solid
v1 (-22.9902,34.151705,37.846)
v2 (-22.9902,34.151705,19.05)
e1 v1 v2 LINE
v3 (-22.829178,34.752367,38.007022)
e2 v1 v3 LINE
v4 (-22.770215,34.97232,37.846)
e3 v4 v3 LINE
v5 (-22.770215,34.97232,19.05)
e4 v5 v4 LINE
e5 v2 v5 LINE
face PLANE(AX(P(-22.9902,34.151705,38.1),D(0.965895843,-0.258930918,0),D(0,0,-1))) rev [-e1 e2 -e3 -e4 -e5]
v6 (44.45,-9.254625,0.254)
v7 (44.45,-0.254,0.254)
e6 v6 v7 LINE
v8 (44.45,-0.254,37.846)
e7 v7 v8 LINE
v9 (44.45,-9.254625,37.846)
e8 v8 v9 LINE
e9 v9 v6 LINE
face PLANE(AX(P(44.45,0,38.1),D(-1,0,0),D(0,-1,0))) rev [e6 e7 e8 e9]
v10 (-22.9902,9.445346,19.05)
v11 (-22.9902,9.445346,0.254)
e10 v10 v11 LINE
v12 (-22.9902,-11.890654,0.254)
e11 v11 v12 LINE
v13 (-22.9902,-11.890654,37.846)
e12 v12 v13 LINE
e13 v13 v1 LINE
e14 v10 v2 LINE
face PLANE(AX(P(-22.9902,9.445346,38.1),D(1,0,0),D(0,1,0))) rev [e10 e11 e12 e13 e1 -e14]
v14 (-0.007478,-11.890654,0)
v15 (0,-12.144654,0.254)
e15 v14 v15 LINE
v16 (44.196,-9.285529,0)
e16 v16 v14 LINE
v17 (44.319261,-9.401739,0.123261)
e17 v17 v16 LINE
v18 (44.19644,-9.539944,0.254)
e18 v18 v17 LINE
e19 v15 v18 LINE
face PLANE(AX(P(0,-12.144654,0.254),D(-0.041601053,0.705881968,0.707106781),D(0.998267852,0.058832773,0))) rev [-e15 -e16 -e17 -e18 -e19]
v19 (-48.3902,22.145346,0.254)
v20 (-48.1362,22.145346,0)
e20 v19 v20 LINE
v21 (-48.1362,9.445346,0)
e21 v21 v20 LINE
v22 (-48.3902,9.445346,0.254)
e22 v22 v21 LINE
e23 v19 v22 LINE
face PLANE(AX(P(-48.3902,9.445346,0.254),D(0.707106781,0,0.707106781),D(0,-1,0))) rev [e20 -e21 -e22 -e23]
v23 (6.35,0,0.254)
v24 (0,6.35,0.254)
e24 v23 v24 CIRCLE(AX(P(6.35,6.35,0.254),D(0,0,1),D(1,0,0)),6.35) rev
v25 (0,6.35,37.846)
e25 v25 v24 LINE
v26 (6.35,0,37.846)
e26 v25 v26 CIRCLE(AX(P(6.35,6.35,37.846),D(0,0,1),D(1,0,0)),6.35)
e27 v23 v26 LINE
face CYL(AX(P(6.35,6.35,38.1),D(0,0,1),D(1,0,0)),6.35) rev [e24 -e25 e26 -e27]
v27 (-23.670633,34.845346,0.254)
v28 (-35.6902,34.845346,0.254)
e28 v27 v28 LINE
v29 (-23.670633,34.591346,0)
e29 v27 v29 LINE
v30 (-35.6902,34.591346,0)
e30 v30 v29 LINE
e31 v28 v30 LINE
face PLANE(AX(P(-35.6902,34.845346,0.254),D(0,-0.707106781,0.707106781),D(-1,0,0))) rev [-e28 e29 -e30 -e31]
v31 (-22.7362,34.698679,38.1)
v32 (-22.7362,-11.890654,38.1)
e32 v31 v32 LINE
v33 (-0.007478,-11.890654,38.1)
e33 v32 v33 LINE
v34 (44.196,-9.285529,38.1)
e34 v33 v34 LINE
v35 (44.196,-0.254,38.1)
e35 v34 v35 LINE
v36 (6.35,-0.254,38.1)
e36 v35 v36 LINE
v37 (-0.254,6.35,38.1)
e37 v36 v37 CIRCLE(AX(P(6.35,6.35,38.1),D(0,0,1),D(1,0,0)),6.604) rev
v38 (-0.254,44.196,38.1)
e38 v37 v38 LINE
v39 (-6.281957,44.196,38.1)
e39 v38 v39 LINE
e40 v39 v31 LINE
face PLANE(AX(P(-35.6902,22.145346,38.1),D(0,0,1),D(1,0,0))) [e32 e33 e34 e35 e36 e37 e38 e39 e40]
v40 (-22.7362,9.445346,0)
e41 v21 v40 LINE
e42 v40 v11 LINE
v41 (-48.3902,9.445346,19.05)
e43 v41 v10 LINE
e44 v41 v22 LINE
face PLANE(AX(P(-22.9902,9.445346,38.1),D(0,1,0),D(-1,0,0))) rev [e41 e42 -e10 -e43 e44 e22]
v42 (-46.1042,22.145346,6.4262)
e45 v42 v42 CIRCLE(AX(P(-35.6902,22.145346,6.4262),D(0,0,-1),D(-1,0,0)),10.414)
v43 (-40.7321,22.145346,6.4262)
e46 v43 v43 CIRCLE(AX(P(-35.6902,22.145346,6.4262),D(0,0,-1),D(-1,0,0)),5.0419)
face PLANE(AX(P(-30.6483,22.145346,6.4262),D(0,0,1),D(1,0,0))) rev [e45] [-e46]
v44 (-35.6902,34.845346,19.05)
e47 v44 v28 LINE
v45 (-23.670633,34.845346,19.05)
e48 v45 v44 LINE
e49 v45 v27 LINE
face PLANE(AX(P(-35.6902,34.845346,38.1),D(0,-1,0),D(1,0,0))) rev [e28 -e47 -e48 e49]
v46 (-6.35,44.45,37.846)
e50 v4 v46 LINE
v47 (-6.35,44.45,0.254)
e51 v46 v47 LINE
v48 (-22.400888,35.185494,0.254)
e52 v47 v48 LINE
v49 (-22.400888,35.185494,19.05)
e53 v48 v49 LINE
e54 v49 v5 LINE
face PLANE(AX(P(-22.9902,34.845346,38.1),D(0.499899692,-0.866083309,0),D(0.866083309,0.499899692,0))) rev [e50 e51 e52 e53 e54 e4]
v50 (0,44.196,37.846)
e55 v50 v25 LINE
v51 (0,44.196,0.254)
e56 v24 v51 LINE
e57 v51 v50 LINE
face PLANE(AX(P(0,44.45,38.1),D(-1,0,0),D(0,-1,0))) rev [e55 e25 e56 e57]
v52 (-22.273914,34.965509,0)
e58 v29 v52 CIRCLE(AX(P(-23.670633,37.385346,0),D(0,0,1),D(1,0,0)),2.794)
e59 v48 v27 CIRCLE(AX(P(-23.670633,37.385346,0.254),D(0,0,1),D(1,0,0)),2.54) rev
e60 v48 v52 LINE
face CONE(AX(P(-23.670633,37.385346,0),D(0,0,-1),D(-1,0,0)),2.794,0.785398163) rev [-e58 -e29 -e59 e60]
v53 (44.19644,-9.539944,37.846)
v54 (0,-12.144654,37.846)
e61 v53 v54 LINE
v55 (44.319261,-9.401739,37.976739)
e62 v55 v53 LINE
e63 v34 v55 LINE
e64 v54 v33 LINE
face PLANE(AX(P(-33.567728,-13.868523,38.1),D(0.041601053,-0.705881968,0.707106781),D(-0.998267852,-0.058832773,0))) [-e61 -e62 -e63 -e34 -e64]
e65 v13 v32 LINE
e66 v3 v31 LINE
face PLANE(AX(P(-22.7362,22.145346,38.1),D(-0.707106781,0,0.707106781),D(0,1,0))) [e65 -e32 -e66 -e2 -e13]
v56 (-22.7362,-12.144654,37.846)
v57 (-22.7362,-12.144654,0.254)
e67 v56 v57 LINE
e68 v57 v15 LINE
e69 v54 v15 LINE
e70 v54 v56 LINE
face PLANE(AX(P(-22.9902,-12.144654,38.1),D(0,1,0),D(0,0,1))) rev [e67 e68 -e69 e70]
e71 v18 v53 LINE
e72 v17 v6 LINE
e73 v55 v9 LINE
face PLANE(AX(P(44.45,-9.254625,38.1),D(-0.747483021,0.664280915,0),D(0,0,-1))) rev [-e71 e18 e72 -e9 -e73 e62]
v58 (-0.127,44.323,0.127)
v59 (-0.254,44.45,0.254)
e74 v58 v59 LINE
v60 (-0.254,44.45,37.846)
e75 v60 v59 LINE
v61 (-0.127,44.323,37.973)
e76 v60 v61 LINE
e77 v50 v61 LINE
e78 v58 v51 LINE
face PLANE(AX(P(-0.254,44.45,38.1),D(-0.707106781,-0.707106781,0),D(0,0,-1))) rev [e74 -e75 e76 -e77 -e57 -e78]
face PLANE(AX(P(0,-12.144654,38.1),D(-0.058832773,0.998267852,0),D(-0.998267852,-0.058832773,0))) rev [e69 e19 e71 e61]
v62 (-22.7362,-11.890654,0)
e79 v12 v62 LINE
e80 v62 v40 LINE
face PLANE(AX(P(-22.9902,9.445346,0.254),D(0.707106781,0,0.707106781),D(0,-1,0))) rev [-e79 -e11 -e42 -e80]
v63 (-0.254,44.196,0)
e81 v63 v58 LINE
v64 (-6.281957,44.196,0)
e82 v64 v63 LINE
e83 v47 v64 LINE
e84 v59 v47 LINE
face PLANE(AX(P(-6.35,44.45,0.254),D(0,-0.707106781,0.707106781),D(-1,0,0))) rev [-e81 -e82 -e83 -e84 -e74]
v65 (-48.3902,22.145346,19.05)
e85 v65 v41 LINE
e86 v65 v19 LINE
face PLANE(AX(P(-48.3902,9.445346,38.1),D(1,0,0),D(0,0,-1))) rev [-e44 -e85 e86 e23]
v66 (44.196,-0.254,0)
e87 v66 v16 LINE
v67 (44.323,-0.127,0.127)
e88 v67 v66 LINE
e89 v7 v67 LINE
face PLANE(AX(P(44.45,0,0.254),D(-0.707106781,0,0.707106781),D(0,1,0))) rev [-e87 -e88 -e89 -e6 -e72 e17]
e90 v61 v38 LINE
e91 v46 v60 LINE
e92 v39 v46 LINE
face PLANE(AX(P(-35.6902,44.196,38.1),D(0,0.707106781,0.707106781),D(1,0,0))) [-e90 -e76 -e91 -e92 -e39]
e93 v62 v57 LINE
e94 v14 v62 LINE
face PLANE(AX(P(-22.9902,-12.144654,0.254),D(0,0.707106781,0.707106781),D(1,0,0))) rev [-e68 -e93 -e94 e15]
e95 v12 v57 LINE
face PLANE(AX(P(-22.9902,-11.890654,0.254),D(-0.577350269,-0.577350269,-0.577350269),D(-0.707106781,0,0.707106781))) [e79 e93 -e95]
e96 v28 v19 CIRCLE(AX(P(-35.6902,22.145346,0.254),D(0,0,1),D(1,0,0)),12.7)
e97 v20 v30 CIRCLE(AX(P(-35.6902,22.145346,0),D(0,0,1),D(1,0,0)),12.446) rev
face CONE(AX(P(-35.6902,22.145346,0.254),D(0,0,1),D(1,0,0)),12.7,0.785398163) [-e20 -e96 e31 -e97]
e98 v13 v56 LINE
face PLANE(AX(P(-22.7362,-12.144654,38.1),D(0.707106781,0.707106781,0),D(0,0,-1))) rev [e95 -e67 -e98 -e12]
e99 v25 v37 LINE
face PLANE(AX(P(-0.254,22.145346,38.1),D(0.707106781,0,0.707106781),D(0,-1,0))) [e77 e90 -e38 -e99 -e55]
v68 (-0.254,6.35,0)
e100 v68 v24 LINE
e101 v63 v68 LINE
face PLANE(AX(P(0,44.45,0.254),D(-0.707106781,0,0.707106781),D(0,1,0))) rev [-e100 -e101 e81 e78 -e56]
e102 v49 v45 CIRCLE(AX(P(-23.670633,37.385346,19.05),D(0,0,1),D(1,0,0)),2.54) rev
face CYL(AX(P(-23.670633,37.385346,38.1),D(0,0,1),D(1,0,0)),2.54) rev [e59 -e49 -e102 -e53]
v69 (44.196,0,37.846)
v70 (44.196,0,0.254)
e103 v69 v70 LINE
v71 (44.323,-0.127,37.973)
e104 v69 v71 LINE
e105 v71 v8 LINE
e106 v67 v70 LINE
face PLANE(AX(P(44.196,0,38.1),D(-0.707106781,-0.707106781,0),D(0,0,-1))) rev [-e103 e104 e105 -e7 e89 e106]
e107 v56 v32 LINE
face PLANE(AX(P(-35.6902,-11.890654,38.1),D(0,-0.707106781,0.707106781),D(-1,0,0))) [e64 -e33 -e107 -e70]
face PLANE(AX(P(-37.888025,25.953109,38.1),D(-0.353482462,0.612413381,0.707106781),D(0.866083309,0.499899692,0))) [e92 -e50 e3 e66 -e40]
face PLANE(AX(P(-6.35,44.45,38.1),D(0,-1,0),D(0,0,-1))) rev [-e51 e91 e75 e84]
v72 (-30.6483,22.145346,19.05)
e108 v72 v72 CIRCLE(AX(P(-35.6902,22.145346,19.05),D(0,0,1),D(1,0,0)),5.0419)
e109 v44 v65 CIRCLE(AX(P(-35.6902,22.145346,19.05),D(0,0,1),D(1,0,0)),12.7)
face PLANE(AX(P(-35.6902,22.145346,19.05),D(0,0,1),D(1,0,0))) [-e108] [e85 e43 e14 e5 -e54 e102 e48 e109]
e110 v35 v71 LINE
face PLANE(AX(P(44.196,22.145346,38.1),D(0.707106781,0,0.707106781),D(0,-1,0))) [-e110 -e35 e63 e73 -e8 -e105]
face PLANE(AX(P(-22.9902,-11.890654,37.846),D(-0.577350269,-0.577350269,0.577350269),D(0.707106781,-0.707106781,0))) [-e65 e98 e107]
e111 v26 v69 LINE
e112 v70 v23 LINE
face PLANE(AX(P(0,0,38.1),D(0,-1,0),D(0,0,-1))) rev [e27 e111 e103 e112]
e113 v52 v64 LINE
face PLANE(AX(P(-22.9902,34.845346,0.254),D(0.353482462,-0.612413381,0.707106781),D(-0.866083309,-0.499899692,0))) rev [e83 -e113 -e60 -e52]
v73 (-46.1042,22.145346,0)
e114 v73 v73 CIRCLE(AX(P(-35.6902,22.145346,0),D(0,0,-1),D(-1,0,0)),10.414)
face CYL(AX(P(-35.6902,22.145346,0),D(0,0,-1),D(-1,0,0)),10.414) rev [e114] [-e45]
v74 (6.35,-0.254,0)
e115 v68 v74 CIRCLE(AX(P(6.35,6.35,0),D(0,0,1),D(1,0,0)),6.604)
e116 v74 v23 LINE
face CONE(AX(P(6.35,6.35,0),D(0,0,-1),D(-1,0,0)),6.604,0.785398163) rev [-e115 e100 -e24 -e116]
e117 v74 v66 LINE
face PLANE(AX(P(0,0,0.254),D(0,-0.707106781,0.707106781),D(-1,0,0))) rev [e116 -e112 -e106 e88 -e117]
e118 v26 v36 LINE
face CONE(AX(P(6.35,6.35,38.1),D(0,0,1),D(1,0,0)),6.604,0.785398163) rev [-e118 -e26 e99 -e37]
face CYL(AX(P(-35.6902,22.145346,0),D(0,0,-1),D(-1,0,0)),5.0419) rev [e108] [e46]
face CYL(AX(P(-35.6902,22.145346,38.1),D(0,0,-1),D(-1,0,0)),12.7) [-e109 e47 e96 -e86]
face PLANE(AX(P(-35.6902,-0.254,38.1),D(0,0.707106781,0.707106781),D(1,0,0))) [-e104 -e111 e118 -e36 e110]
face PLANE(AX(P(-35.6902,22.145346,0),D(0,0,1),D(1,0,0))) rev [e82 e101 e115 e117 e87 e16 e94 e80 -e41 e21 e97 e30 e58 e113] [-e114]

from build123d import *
from OCP.BRepFilletAPI import BRepFilletAPI_MakeChamfer

# Parameters (mm, degrees)
BOSS_EXTRUDE1_DEPTH                                  = 38.1
FILLET2_R                                            = 6.35
CUT_EXTRUDE1_START                                   = -19.05
CUT_EXTRUDE1_DEPTH                                   = 19.05
FILLET3_R                                            = 2.54
CBORE_FOR_3_8_BINDING_HEAD_MACHINE_SCREW_D           = 10.0838
CBORE_FOR_3_8_BINDING_HEAD_MACHINE_SCREW_CBORE_D     = 20.828
CBORE_FOR_3_8_BINDING_HEAD_MACHINE_SCREW_CBORE_DEPTH = 6.4262
CHAMFER3_SIZE                                        = 0.254
CHAMFER5_SIZE                                        = 0.254
CHAMFER5_SIZE2                                       = 0.270375256


with BuildPart() as part:
    # Sketch1 → Boss-Extrude1 (new body)
    with BuildSketch(Plane.XY):
        with BuildLine():
            Line((0, 0), (44.45, 0))
            Line((44.45, 0), (44.45, -9.525))
            Line((44.45, -9.525), (0, -12.1446544))
            Line((0, -12.1446544), (-22.9902, -12.1446544))
            Line((-22.9902, -12.1446544), (-22.9902, 9.4453456))
            Line((-22.9902, 9.4453456), (-48.3902, 9.4453456))
            Line((-48.3902, 9.4453456), (-48.3902, 22.1453456))
            ThreePointArc((-48.3902, 22.1453456), (-44.670456121, 31.125601721), (-35.6902, 34.8453456))
            Line((-35.6902, 34.8453456), (-22.9902, 34.8453456))
            Line((-22.9902, 34.8453456), (-6.35, 44.45))
            Line((-6.35, 44.45), (0, 44.45))
            Line((0, 44.45), (0, 0))
        make_face()
    extrude(amount=BOSS_EXTRUDE1_DEPTH)

    # Fillet2
    fillet2_edges = [part.edges().sort_by_distance(p)[0] for p in [
        (0, 0, 19.05),
    ]]
    fillet(fillet2_edges, radius=FILLET2_R)

    # Sketch3 → Cut-Extrude1 (cut)
    with BuildSketch(Plane.XY.offset(38.1).offset(CUT_EXTRUDE1_START)):
        with BuildLine():
            Line((-48.3902, 9.4453456), (-22.9902, 9.4453456))
            Line((-22.9902, 9.4453456), (-22.9902, 34.8453456))
            Line((-22.9902, 34.8453456), (-35.6902, 34.8453456))
            ThreePointArc((-35.6902, 34.8453456), (-44.670456121, 31.125601721), (-48.3902, 22.1453456))
            Line((-48.3902, 22.1453456), (-48.3902, 9.4453456))
        make_face()
    extrude(amount=CUT_EXTRUDE1_DEPTH, mode=Mode.SUBTRACT)

    # Fillet3
    fillet3_edges = [part.edges().sort_by_distance(p)[0] for p in [
        (-22.9902, 34.8453456, 9.525),
    ]]
    fillet(fillet3_edges, radius=FILLET3_R)

    # CBORE for 3/8 Binding Head Machine Screw1 (through all)
    with Locations(Plane(origin=(0, 0, 0), x_dir=(-1, 0, 0), z_dir=(0, 0, -1))):
        with Locations((35.6902, 22.1453456)):
            CounterBoreHole(CBORE_FOR_3_8_BINDING_HEAD_MACHINE_SCREW_D / 2, CBORE_FOR_3_8_BINDING_HEAD_MACHINE_SCREW_CBORE_D / 2, CBORE_FOR_3_8_BINDING_HEAD_MACHINE_SCREW_CBORE_DEPTH)

    # Chamfer3
    chamfer3_edges = [part.edges().sort_by_distance(p)[0] for p in [
        (25.4, 0, 0),
        (44.45, 0, 19.05),
        (0, 44.45, 19.05),
        (0, 25.4, 0),
        (0, 25.4, 38.1),
        (1.859871939, 1.859871939, 0),
        (1.859871939, 1.859871939, 38.1),
        (25.4, 0, 38.1),
    ]]
    chamfer(chamfer3_edges, length=CHAMFER3_SIZE)

    # Chamfer5: one chamfer whose edges measure the first distance from different faces: ONE call of the kernel's chamfer builder (chamfer() names one face for all edges)
    chamfer5_edges_1 = [part.edges().sort_by_distance(p)[0] for p in [
        (44.45, -4.8895, 0),
        (-14.6701, 39.6476728, 38.1),
        (-48.3902, 15.7953456, 0),
        (-44.670456121, 31.125601721, 0),
        (-14.375444039, 39.817746998, 0),
        (44.45, -4.8895, 38.1),
        (-29.680416649, 34.8453456, 0),
        (-23.013375005, 34.931855935, 0),
        (-3.302, 44.45, 38.1),
        (-3.302, 44.45, 0),
    ]]
    chamfer5_edges_2 = [part.edges().sort_by_distance(p)[0] for p in [
        (44.45, -9.525, 19.05),
    ]]
    chamfer5_side_2 = [part.faces().sort_by_distance(p)[0] for p in [
        (22.225, -10.8348272, 19.05),
    ]]
    chamfer5 = BRepFilletAPI_MakeChamfer(part.part.solid().wrapped)
    for e in chamfer5_edges_1:
        chamfer5.Add(CHAMFER5_SIZE, e.wrapped)
    for e in chamfer5_edges_2:
        chamfer5.Add(CHAMFER5_SIZE, CHAMFER5_SIZE2, e.wrapped, chamfer5_side_2[0].wrapped)  # the first distance lies on this face
    add(Compound.cast(chamfer5.Shape()), mode=Mode.REPLACE)

    # Chamfer6
    # the kernel refuses this chamfer: 0.693641083, 0.254 mm, written as the material it takes off along each edge
    with BuildSketch(Plane(origin=(-22.820866667, -11.975321067, 0.169333333), x_dir=(0, -0.7071067811865468, 0.7071067811865481), z_dir=(-0.5773502691896234, -0.5773502691896274, -0.5773502691896264))) as chamfer6_piece_1:
        Polygon((-0.179605122, -0.103695066), (0.179605122, -0.103695066), (0, 0.207390132), align=None)
    extrude(amount=0.32262333, mode=Mode.SUBTRACT)
    with BuildSketch(Plane(origin=(-22.820866667, -11.975321067, 37.930666667), x_dir=(0, -0.70710678118655, -0.707106781186545), z_dir=(-0.5773502691896217, -0.5773502691896258, 0.5773502691896298))) as chamfer6_piece_2:
        Polygon((-0.179605122, 0.103695066), (0.179605122, 0.103695066), (0, -0.207390132), align=None)
    extrude(amount=0.32262333, mode=Mode.SUBTRACT)
    with BuildSketch(Plane(origin=(-22.9902, 34.8453456, 19.05), x_dir=(-0.009971465906807519, -0.9999502836979793, 0), z_dir=(0, 0, 1))) as chamfer6_piece_3:
        with BuildLine():
            Line((0.720476303, 0), (-0.15603149, 0.22562472))
            Line((-0.15603149, 0.22562472), (-0.16797676, 0.218570238))
            ThreePointArc((-0.16797676, 0.218570238), (-0.081514433, 0.11074615), (-0.01194527, -0.007054482))
            Line((-0.01194527, -0.007054482), (0.000138332, -0.013872132))
            ThreePointArc((0.000138332, -0.013872132), (0.360340666, -0.010280208), (0.720614636, -0.013872132))
            Line((0.720614636, -0.013872132), (0.720476303, 0))
        make_face()
    extrude(amount=20.597190759, mode=Mode.SUBTRACT)
    with BuildSketch(Plane(origin=(-22.9902, -12.797861879, 0), x_dir=(0.9996219169112968, 0, -0.027495876610586136), z_dir=(0, 1, 0))) as chamfer6_piece_4:
        with BuildLine():
            Line((0.261282992, 0), (-0.014362977, -0.26088792))
            Line((-0.014362977, -0.26088792), (-0.019441057, -0.260748241))
            ThreePointArc((-0.019441057, -0.260748241), (-0.008668824, -0.130403049), (-0.005078079, 0.000139679))
            Line((-0.005078079, 0.000139679), (0.000139679, 0.005078079))
            ThreePointArc((0.000139679, 0.005078079), (0.130682407, 0.001487335), (0.261422671, 0.005078079))
            Line((0.261422671, 0.005078079), (0.261282992, 0))
        make_face()
    extrude(amount=22.243207479, mode=Mode.SUBTRACT)
    with BuildSketch(Plane(origin=(44.848076027, -9.501539446, 0), x_dir=(-0.058810529584687465, 0.9978904240343144, -0.027495876610586504), z_dir=(-0.9982678522272378, -0.05883277326131908, 0)), Plane(origin=(44.848076027, -9.501539446, 38.1), x_dir=(0.0016176586742518812, -0.02744824968915599, -0.9996219169112968), z_dir=(-0.9982678522272378, -0.05883277326131908, 0))) as chamfer6_piece_5:
        with BuildLine():
            Line((0.261282992, 0), (-0.014362977, -0.26088792))
            Line((-0.014362977, -0.26088792), (-0.019441057, -0.260748241))
            ThreePointArc((-0.019441057, -0.260748241), (-0.008668824, -0.130403049), (-0.005078079, 0.000139679))
            Line((-0.005078079, 0.000139679), (0.000139679, 0.005078079))
            ThreePointArc((0.000139679, 0.005078079), (0.130682407, 0.001487335), (0.261422671, 0.005078079))
            Line((0.261422671, 0.005078079), (0.261282992, 0))
        make_face()
    extrude(amount=45.579101794, mode=Mode.SUBTRACT)
    with BuildSketch(Plane(origin=(0.653207479, -12.1446544, 0), x_dir=(0, 0.9996219169112968, -0.0274958766105868), z_dir=(-1, 0, 0)), Plane(origin=(0.653207479, -12.1446544, 38.1), x_dir=(0, -0.027495876610587867, -0.9996219169112968), z_dir=(-1, 0, 0))) as chamfer6_piece_6:
        with BuildLine():
            Line((0.261282992, 0), (-0.014362977, -0.26088792))
            Line((-0.014362977, -0.26088792), (-0.019441057, -0.260748241))
            ThreePointArc((-0.019441057, -0.260748241), (-0.008668824, -0.130403049), (-0.005078079, 0.000139679))
            Line((-0.005078079, 0.000139679), (0.000139679, 0.005078079))
            ThreePointArc((0.000139679, 0.005078079), (0.130682407, 0.001487335), (0.261422671, 0.005078079))
            Line((0.261422671, 0.005078079), (0.261282992, 0))
        make_face()
    extrude(amount=24.296614958, mode=Mode.SUBTRACT)
    with BuildSketch(Plane(origin=(-22.9902, -12.1446544, -0.653207479), x_dir=(0.9996219169112968, -0.027495876610587118, 0), z_dir=(0, 0, 1))) as chamfer6_piece_7:
        with BuildLine():
            Line((0.261282992, 0), (-0.014362977, 0.26088792))
            Line((-0.014362977, 0.26088792), (-0.019441057, 0.260748241))
            ThreePointArc((-0.019441057, 0.260748241), (-0.008668824, 0.130403049), (-0.005078079, -0.000139679))
            Line((-0.005078079, -0.000139679), (0.000139679, -0.005078079))
            ThreePointArc((0.000139679, -0.005078079), (0.130682407, -0.001487335), (0.261422671, -0.005078079))
            Line((0.261422671, -0.005078079), (0.261282992, 0))
        make_face()
    extrude(amount=39.406414958, mode=Mode.SUBTRACT)
    with BuildSketch(Plane(origin=(-22.9902, 35.205278751, 38.1), x_dir=(-0.027495876610587867, 0, -0.9996219169112968), z_dir=(0, -1, 0))) as chamfer6_piece_8:
        with BuildLine():
            Line((0.261282992, 0), (-0.014362977, 0.26088792))
            Line((-0.014362977, 0.26088792), (-0.019441057, 0.260748241))
            ThreePointArc((-0.019441057, 0.260748241), (-0.008668824, 0.130403049), (-0.005078079, -0.000139679))
            Line((-0.005078079, -0.000139679), (0.000139679, -0.005078079))
            ThreePointArc((0.000139679, -0.005078079), (0.130682407, -0.001487335), (0.261422671, -0.005078079))
            Line((0.261422671, -0.005078079), (0.261282992, 0))
        make_face()
    extrude(amount=48.00314063, mode=Mode.SUBTRACT)


solid = part.part
